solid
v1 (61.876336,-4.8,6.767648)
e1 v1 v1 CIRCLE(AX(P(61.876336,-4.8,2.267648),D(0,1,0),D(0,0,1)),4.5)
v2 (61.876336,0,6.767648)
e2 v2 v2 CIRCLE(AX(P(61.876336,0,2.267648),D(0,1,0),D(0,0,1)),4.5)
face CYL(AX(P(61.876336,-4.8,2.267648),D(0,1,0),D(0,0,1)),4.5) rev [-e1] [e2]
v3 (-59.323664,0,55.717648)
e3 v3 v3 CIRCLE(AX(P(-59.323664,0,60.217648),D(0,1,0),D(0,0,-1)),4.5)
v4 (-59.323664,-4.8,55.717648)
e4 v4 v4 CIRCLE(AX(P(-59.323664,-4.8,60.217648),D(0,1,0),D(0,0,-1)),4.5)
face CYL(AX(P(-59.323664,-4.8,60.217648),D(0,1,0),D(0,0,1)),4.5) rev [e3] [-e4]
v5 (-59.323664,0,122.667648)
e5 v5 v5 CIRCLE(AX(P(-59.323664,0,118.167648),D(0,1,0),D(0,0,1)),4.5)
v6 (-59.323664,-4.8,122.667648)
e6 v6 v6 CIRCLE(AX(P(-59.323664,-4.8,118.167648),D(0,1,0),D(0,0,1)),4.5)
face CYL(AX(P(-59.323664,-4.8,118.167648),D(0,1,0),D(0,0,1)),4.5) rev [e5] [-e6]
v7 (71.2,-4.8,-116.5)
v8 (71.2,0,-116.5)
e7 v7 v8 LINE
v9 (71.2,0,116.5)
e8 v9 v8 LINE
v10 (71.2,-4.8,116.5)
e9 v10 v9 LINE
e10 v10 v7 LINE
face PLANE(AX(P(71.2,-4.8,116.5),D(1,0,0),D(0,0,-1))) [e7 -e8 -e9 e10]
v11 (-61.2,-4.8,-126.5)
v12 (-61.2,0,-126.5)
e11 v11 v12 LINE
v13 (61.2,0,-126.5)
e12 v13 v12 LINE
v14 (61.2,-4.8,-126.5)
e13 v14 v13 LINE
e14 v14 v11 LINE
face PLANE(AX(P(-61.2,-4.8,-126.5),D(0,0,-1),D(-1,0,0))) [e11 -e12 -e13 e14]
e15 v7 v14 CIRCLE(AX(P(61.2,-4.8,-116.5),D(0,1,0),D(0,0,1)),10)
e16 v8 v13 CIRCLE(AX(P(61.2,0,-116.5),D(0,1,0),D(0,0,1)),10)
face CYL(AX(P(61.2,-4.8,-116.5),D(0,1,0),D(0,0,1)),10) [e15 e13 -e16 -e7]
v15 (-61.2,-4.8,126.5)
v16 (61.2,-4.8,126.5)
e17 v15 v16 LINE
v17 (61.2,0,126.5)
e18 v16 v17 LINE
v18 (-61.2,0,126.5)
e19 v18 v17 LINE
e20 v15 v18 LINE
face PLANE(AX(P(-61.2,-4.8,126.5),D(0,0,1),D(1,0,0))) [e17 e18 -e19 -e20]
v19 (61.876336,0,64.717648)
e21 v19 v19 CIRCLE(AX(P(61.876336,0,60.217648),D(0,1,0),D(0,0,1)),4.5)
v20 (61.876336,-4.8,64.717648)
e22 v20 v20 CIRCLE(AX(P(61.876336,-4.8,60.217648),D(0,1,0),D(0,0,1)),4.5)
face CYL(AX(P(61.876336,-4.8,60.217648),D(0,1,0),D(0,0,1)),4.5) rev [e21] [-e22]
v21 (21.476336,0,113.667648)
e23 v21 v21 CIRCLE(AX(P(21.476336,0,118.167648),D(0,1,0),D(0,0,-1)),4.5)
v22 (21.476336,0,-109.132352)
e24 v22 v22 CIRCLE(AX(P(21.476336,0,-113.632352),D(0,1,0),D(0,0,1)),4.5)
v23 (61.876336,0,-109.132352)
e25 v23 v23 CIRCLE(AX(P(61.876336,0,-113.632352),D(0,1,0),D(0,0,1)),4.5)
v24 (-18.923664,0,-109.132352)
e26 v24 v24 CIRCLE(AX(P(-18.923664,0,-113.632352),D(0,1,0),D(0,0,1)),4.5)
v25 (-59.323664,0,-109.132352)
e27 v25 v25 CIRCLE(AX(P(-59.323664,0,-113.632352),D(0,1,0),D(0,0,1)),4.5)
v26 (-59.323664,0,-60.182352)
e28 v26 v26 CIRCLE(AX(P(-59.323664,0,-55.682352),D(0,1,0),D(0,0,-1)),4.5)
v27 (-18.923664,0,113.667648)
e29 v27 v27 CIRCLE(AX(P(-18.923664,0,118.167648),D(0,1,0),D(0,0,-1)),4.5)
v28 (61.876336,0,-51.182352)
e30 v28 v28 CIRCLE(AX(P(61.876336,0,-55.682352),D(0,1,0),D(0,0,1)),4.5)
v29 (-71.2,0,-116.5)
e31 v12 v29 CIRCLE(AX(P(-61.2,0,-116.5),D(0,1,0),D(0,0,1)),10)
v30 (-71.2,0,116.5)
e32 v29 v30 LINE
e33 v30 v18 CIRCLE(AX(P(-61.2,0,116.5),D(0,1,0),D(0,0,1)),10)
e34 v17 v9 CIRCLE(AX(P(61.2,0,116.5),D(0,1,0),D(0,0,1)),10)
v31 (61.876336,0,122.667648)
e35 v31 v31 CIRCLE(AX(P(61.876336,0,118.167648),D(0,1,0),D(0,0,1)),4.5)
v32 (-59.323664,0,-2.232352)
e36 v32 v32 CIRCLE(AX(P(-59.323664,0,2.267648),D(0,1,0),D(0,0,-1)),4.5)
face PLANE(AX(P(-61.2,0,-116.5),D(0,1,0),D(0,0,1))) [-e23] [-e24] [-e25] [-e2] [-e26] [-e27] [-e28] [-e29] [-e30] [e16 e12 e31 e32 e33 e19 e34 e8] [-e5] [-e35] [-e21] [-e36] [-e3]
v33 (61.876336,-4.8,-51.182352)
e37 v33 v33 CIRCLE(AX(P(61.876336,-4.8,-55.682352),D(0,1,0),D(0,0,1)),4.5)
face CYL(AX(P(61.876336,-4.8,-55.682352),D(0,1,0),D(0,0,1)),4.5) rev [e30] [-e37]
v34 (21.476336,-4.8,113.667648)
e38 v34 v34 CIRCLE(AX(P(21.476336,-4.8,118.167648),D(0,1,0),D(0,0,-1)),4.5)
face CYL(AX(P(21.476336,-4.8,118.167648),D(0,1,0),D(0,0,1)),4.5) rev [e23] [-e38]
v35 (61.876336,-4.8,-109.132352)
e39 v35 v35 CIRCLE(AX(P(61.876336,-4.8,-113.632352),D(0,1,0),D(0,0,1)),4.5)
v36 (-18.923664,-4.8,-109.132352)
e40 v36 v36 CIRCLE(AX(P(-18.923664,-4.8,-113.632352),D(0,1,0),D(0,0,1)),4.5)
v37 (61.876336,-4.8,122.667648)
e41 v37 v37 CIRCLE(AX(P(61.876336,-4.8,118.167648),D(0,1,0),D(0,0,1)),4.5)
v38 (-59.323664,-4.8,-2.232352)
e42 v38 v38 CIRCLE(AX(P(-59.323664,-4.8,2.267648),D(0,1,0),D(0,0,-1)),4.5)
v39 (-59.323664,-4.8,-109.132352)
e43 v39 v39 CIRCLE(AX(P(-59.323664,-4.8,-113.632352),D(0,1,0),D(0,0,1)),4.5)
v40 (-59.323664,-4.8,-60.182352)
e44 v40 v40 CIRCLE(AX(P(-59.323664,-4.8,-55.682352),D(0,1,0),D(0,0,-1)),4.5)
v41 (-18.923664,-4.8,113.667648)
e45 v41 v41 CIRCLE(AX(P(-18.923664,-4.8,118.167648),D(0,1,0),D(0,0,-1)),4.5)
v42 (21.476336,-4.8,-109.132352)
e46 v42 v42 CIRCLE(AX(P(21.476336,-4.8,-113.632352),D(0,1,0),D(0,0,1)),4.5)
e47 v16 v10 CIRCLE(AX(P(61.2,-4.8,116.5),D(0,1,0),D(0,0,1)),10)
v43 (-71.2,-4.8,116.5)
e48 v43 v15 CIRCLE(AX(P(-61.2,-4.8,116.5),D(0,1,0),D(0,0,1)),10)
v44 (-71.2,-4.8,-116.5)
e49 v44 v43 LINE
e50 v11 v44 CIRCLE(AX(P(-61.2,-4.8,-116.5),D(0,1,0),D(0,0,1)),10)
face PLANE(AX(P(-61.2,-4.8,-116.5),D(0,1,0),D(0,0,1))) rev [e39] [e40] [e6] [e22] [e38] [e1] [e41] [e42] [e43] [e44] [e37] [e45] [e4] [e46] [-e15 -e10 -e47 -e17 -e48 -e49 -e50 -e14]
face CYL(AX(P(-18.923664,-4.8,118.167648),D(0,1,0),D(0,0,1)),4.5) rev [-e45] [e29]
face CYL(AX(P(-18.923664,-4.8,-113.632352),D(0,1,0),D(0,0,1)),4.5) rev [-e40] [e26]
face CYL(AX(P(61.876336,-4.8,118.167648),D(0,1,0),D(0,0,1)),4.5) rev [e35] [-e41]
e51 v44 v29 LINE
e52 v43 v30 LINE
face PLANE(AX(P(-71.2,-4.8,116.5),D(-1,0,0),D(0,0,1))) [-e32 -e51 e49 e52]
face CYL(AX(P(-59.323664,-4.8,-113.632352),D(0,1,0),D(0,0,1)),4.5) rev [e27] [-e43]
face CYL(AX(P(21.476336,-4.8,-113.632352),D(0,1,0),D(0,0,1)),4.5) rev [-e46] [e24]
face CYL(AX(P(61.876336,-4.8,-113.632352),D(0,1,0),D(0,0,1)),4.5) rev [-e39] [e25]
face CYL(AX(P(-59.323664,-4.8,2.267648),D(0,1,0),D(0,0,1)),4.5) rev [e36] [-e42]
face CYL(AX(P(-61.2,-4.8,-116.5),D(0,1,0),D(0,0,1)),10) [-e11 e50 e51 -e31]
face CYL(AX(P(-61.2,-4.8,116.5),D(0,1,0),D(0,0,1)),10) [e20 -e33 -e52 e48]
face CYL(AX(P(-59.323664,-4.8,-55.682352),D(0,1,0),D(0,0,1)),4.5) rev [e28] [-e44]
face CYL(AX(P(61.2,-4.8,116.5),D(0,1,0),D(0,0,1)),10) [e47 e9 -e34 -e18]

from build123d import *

# Parameters (mm, degrees)
ESBO_O1_R          = 4.5
FLANGE_BASE1_DEPTH = 4.8


# Sheet-metal steps are written as plain solids
with BuildPart() as part:
    # Esboço1 → Flange-base1 (new body)
    with BuildSketch(Plane(origin=(0, 0, 0), x_dir=(1, 0, 0), z_dir=(0, 1, 0))):
        with BuildLine():
            Line((-61.2, -126.5), (61.2, -126.5))
            ThreePointArc((61.2, -126.5), (68.271067812, -123.571067812), (71.2, -116.5))
            Line((71.2, -116.5), (71.2, 116.5))
            ThreePointArc((71.2, 116.5), (68.271067812, 123.571067812), (61.2, 126.5))
            Line((61.2, 126.5), (-61.2, 126.5))
            ThreePointArc((-61.2, 126.5), (-68.271067812, 123.571067812), (-71.2, 116.5))
            Line((-71.2, 116.5), (-71.2, -116.5))
            ThreePointArc((-71.2, -116.5), (-68.271067812, -123.571067812), (-61.2, -126.5))
        make_face()
        with Locations(Location((-59.32366364, 113.632351832, 0), (0, 0, 270))):
            Circle(ESBO_O1_R, mode=Mode.SUBTRACT)
        with Locations(Location((61.87633636, 113.632351832, 0), (0, 0, 270))):
            Circle(ESBO_O1_R, mode=Mode.SUBTRACT)
        with Locations(Location((-59.32366364, -118.167648168, 0), (0, 0, 270))):
            Circle(ESBO_O1_R, mode=Mode.SUBTRACT)
        with Locations(Location((61.87633636, -118.167648168, 0), (0, 0, 270))):
            Circle(ESBO_O1_R, mode=Mode.SUBTRACT)
        with Locations(Location((-18.92366364, 113.632351832, 0), (0, 0, 270))):
            Circle(ESBO_O1_R, mode=Mode.SUBTRACT)
        with Locations(Location((21.47633636, 113.632351832, 0), (0, 0, 270))):
            Circle(ESBO_O1_R, mode=Mode.SUBTRACT)
        with Locations(Location((61.87633636, 55.682351832, 0), (0, 0, 270))):
            Circle(ESBO_O1_R, mode=Mode.SUBTRACT)
        with Locations(Location((61.87633636, -2.267648168, 0), (0, 0, 270))):
            Circle(ESBO_O1_R, mode=Mode.SUBTRACT)
        with Locations(Location((61.87633636, -60.217648168, 0), (0, 0, 270))):
            Circle(ESBO_O1_R, mode=Mode.SUBTRACT)
        with Locations(Location((21.47633636, -118.167648168, 0), (0, 0, 90))):
            Circle(ESBO_O1_R, mode=Mode.SUBTRACT)
        with Locations(Location((-18.92366364, -118.167648168, 0), (0, 0, 90))):
            Circle(ESBO_O1_R, mode=Mode.SUBTRACT)
        with Locations(Location((-59.32366364, -60.217648168, 0), (0, 0, 90))):
            Circle(ESBO_O1_R, mode=Mode.SUBTRACT)
        with Locations(Location((-59.32366364, -2.267648168, 0), (0, 0, 90))):
            Circle(ESBO_O1_R, mode=Mode.SUBTRACT)
        with Locations(Location((-59.32366364, 55.682351832, 0), (0, 0, 90))):
            Circle(ESBO_O1_R, mode=Mode.SUBTRACT)
    extrude(amount=-FLANGE_BASE1_DEPTH)


solid = part.part
